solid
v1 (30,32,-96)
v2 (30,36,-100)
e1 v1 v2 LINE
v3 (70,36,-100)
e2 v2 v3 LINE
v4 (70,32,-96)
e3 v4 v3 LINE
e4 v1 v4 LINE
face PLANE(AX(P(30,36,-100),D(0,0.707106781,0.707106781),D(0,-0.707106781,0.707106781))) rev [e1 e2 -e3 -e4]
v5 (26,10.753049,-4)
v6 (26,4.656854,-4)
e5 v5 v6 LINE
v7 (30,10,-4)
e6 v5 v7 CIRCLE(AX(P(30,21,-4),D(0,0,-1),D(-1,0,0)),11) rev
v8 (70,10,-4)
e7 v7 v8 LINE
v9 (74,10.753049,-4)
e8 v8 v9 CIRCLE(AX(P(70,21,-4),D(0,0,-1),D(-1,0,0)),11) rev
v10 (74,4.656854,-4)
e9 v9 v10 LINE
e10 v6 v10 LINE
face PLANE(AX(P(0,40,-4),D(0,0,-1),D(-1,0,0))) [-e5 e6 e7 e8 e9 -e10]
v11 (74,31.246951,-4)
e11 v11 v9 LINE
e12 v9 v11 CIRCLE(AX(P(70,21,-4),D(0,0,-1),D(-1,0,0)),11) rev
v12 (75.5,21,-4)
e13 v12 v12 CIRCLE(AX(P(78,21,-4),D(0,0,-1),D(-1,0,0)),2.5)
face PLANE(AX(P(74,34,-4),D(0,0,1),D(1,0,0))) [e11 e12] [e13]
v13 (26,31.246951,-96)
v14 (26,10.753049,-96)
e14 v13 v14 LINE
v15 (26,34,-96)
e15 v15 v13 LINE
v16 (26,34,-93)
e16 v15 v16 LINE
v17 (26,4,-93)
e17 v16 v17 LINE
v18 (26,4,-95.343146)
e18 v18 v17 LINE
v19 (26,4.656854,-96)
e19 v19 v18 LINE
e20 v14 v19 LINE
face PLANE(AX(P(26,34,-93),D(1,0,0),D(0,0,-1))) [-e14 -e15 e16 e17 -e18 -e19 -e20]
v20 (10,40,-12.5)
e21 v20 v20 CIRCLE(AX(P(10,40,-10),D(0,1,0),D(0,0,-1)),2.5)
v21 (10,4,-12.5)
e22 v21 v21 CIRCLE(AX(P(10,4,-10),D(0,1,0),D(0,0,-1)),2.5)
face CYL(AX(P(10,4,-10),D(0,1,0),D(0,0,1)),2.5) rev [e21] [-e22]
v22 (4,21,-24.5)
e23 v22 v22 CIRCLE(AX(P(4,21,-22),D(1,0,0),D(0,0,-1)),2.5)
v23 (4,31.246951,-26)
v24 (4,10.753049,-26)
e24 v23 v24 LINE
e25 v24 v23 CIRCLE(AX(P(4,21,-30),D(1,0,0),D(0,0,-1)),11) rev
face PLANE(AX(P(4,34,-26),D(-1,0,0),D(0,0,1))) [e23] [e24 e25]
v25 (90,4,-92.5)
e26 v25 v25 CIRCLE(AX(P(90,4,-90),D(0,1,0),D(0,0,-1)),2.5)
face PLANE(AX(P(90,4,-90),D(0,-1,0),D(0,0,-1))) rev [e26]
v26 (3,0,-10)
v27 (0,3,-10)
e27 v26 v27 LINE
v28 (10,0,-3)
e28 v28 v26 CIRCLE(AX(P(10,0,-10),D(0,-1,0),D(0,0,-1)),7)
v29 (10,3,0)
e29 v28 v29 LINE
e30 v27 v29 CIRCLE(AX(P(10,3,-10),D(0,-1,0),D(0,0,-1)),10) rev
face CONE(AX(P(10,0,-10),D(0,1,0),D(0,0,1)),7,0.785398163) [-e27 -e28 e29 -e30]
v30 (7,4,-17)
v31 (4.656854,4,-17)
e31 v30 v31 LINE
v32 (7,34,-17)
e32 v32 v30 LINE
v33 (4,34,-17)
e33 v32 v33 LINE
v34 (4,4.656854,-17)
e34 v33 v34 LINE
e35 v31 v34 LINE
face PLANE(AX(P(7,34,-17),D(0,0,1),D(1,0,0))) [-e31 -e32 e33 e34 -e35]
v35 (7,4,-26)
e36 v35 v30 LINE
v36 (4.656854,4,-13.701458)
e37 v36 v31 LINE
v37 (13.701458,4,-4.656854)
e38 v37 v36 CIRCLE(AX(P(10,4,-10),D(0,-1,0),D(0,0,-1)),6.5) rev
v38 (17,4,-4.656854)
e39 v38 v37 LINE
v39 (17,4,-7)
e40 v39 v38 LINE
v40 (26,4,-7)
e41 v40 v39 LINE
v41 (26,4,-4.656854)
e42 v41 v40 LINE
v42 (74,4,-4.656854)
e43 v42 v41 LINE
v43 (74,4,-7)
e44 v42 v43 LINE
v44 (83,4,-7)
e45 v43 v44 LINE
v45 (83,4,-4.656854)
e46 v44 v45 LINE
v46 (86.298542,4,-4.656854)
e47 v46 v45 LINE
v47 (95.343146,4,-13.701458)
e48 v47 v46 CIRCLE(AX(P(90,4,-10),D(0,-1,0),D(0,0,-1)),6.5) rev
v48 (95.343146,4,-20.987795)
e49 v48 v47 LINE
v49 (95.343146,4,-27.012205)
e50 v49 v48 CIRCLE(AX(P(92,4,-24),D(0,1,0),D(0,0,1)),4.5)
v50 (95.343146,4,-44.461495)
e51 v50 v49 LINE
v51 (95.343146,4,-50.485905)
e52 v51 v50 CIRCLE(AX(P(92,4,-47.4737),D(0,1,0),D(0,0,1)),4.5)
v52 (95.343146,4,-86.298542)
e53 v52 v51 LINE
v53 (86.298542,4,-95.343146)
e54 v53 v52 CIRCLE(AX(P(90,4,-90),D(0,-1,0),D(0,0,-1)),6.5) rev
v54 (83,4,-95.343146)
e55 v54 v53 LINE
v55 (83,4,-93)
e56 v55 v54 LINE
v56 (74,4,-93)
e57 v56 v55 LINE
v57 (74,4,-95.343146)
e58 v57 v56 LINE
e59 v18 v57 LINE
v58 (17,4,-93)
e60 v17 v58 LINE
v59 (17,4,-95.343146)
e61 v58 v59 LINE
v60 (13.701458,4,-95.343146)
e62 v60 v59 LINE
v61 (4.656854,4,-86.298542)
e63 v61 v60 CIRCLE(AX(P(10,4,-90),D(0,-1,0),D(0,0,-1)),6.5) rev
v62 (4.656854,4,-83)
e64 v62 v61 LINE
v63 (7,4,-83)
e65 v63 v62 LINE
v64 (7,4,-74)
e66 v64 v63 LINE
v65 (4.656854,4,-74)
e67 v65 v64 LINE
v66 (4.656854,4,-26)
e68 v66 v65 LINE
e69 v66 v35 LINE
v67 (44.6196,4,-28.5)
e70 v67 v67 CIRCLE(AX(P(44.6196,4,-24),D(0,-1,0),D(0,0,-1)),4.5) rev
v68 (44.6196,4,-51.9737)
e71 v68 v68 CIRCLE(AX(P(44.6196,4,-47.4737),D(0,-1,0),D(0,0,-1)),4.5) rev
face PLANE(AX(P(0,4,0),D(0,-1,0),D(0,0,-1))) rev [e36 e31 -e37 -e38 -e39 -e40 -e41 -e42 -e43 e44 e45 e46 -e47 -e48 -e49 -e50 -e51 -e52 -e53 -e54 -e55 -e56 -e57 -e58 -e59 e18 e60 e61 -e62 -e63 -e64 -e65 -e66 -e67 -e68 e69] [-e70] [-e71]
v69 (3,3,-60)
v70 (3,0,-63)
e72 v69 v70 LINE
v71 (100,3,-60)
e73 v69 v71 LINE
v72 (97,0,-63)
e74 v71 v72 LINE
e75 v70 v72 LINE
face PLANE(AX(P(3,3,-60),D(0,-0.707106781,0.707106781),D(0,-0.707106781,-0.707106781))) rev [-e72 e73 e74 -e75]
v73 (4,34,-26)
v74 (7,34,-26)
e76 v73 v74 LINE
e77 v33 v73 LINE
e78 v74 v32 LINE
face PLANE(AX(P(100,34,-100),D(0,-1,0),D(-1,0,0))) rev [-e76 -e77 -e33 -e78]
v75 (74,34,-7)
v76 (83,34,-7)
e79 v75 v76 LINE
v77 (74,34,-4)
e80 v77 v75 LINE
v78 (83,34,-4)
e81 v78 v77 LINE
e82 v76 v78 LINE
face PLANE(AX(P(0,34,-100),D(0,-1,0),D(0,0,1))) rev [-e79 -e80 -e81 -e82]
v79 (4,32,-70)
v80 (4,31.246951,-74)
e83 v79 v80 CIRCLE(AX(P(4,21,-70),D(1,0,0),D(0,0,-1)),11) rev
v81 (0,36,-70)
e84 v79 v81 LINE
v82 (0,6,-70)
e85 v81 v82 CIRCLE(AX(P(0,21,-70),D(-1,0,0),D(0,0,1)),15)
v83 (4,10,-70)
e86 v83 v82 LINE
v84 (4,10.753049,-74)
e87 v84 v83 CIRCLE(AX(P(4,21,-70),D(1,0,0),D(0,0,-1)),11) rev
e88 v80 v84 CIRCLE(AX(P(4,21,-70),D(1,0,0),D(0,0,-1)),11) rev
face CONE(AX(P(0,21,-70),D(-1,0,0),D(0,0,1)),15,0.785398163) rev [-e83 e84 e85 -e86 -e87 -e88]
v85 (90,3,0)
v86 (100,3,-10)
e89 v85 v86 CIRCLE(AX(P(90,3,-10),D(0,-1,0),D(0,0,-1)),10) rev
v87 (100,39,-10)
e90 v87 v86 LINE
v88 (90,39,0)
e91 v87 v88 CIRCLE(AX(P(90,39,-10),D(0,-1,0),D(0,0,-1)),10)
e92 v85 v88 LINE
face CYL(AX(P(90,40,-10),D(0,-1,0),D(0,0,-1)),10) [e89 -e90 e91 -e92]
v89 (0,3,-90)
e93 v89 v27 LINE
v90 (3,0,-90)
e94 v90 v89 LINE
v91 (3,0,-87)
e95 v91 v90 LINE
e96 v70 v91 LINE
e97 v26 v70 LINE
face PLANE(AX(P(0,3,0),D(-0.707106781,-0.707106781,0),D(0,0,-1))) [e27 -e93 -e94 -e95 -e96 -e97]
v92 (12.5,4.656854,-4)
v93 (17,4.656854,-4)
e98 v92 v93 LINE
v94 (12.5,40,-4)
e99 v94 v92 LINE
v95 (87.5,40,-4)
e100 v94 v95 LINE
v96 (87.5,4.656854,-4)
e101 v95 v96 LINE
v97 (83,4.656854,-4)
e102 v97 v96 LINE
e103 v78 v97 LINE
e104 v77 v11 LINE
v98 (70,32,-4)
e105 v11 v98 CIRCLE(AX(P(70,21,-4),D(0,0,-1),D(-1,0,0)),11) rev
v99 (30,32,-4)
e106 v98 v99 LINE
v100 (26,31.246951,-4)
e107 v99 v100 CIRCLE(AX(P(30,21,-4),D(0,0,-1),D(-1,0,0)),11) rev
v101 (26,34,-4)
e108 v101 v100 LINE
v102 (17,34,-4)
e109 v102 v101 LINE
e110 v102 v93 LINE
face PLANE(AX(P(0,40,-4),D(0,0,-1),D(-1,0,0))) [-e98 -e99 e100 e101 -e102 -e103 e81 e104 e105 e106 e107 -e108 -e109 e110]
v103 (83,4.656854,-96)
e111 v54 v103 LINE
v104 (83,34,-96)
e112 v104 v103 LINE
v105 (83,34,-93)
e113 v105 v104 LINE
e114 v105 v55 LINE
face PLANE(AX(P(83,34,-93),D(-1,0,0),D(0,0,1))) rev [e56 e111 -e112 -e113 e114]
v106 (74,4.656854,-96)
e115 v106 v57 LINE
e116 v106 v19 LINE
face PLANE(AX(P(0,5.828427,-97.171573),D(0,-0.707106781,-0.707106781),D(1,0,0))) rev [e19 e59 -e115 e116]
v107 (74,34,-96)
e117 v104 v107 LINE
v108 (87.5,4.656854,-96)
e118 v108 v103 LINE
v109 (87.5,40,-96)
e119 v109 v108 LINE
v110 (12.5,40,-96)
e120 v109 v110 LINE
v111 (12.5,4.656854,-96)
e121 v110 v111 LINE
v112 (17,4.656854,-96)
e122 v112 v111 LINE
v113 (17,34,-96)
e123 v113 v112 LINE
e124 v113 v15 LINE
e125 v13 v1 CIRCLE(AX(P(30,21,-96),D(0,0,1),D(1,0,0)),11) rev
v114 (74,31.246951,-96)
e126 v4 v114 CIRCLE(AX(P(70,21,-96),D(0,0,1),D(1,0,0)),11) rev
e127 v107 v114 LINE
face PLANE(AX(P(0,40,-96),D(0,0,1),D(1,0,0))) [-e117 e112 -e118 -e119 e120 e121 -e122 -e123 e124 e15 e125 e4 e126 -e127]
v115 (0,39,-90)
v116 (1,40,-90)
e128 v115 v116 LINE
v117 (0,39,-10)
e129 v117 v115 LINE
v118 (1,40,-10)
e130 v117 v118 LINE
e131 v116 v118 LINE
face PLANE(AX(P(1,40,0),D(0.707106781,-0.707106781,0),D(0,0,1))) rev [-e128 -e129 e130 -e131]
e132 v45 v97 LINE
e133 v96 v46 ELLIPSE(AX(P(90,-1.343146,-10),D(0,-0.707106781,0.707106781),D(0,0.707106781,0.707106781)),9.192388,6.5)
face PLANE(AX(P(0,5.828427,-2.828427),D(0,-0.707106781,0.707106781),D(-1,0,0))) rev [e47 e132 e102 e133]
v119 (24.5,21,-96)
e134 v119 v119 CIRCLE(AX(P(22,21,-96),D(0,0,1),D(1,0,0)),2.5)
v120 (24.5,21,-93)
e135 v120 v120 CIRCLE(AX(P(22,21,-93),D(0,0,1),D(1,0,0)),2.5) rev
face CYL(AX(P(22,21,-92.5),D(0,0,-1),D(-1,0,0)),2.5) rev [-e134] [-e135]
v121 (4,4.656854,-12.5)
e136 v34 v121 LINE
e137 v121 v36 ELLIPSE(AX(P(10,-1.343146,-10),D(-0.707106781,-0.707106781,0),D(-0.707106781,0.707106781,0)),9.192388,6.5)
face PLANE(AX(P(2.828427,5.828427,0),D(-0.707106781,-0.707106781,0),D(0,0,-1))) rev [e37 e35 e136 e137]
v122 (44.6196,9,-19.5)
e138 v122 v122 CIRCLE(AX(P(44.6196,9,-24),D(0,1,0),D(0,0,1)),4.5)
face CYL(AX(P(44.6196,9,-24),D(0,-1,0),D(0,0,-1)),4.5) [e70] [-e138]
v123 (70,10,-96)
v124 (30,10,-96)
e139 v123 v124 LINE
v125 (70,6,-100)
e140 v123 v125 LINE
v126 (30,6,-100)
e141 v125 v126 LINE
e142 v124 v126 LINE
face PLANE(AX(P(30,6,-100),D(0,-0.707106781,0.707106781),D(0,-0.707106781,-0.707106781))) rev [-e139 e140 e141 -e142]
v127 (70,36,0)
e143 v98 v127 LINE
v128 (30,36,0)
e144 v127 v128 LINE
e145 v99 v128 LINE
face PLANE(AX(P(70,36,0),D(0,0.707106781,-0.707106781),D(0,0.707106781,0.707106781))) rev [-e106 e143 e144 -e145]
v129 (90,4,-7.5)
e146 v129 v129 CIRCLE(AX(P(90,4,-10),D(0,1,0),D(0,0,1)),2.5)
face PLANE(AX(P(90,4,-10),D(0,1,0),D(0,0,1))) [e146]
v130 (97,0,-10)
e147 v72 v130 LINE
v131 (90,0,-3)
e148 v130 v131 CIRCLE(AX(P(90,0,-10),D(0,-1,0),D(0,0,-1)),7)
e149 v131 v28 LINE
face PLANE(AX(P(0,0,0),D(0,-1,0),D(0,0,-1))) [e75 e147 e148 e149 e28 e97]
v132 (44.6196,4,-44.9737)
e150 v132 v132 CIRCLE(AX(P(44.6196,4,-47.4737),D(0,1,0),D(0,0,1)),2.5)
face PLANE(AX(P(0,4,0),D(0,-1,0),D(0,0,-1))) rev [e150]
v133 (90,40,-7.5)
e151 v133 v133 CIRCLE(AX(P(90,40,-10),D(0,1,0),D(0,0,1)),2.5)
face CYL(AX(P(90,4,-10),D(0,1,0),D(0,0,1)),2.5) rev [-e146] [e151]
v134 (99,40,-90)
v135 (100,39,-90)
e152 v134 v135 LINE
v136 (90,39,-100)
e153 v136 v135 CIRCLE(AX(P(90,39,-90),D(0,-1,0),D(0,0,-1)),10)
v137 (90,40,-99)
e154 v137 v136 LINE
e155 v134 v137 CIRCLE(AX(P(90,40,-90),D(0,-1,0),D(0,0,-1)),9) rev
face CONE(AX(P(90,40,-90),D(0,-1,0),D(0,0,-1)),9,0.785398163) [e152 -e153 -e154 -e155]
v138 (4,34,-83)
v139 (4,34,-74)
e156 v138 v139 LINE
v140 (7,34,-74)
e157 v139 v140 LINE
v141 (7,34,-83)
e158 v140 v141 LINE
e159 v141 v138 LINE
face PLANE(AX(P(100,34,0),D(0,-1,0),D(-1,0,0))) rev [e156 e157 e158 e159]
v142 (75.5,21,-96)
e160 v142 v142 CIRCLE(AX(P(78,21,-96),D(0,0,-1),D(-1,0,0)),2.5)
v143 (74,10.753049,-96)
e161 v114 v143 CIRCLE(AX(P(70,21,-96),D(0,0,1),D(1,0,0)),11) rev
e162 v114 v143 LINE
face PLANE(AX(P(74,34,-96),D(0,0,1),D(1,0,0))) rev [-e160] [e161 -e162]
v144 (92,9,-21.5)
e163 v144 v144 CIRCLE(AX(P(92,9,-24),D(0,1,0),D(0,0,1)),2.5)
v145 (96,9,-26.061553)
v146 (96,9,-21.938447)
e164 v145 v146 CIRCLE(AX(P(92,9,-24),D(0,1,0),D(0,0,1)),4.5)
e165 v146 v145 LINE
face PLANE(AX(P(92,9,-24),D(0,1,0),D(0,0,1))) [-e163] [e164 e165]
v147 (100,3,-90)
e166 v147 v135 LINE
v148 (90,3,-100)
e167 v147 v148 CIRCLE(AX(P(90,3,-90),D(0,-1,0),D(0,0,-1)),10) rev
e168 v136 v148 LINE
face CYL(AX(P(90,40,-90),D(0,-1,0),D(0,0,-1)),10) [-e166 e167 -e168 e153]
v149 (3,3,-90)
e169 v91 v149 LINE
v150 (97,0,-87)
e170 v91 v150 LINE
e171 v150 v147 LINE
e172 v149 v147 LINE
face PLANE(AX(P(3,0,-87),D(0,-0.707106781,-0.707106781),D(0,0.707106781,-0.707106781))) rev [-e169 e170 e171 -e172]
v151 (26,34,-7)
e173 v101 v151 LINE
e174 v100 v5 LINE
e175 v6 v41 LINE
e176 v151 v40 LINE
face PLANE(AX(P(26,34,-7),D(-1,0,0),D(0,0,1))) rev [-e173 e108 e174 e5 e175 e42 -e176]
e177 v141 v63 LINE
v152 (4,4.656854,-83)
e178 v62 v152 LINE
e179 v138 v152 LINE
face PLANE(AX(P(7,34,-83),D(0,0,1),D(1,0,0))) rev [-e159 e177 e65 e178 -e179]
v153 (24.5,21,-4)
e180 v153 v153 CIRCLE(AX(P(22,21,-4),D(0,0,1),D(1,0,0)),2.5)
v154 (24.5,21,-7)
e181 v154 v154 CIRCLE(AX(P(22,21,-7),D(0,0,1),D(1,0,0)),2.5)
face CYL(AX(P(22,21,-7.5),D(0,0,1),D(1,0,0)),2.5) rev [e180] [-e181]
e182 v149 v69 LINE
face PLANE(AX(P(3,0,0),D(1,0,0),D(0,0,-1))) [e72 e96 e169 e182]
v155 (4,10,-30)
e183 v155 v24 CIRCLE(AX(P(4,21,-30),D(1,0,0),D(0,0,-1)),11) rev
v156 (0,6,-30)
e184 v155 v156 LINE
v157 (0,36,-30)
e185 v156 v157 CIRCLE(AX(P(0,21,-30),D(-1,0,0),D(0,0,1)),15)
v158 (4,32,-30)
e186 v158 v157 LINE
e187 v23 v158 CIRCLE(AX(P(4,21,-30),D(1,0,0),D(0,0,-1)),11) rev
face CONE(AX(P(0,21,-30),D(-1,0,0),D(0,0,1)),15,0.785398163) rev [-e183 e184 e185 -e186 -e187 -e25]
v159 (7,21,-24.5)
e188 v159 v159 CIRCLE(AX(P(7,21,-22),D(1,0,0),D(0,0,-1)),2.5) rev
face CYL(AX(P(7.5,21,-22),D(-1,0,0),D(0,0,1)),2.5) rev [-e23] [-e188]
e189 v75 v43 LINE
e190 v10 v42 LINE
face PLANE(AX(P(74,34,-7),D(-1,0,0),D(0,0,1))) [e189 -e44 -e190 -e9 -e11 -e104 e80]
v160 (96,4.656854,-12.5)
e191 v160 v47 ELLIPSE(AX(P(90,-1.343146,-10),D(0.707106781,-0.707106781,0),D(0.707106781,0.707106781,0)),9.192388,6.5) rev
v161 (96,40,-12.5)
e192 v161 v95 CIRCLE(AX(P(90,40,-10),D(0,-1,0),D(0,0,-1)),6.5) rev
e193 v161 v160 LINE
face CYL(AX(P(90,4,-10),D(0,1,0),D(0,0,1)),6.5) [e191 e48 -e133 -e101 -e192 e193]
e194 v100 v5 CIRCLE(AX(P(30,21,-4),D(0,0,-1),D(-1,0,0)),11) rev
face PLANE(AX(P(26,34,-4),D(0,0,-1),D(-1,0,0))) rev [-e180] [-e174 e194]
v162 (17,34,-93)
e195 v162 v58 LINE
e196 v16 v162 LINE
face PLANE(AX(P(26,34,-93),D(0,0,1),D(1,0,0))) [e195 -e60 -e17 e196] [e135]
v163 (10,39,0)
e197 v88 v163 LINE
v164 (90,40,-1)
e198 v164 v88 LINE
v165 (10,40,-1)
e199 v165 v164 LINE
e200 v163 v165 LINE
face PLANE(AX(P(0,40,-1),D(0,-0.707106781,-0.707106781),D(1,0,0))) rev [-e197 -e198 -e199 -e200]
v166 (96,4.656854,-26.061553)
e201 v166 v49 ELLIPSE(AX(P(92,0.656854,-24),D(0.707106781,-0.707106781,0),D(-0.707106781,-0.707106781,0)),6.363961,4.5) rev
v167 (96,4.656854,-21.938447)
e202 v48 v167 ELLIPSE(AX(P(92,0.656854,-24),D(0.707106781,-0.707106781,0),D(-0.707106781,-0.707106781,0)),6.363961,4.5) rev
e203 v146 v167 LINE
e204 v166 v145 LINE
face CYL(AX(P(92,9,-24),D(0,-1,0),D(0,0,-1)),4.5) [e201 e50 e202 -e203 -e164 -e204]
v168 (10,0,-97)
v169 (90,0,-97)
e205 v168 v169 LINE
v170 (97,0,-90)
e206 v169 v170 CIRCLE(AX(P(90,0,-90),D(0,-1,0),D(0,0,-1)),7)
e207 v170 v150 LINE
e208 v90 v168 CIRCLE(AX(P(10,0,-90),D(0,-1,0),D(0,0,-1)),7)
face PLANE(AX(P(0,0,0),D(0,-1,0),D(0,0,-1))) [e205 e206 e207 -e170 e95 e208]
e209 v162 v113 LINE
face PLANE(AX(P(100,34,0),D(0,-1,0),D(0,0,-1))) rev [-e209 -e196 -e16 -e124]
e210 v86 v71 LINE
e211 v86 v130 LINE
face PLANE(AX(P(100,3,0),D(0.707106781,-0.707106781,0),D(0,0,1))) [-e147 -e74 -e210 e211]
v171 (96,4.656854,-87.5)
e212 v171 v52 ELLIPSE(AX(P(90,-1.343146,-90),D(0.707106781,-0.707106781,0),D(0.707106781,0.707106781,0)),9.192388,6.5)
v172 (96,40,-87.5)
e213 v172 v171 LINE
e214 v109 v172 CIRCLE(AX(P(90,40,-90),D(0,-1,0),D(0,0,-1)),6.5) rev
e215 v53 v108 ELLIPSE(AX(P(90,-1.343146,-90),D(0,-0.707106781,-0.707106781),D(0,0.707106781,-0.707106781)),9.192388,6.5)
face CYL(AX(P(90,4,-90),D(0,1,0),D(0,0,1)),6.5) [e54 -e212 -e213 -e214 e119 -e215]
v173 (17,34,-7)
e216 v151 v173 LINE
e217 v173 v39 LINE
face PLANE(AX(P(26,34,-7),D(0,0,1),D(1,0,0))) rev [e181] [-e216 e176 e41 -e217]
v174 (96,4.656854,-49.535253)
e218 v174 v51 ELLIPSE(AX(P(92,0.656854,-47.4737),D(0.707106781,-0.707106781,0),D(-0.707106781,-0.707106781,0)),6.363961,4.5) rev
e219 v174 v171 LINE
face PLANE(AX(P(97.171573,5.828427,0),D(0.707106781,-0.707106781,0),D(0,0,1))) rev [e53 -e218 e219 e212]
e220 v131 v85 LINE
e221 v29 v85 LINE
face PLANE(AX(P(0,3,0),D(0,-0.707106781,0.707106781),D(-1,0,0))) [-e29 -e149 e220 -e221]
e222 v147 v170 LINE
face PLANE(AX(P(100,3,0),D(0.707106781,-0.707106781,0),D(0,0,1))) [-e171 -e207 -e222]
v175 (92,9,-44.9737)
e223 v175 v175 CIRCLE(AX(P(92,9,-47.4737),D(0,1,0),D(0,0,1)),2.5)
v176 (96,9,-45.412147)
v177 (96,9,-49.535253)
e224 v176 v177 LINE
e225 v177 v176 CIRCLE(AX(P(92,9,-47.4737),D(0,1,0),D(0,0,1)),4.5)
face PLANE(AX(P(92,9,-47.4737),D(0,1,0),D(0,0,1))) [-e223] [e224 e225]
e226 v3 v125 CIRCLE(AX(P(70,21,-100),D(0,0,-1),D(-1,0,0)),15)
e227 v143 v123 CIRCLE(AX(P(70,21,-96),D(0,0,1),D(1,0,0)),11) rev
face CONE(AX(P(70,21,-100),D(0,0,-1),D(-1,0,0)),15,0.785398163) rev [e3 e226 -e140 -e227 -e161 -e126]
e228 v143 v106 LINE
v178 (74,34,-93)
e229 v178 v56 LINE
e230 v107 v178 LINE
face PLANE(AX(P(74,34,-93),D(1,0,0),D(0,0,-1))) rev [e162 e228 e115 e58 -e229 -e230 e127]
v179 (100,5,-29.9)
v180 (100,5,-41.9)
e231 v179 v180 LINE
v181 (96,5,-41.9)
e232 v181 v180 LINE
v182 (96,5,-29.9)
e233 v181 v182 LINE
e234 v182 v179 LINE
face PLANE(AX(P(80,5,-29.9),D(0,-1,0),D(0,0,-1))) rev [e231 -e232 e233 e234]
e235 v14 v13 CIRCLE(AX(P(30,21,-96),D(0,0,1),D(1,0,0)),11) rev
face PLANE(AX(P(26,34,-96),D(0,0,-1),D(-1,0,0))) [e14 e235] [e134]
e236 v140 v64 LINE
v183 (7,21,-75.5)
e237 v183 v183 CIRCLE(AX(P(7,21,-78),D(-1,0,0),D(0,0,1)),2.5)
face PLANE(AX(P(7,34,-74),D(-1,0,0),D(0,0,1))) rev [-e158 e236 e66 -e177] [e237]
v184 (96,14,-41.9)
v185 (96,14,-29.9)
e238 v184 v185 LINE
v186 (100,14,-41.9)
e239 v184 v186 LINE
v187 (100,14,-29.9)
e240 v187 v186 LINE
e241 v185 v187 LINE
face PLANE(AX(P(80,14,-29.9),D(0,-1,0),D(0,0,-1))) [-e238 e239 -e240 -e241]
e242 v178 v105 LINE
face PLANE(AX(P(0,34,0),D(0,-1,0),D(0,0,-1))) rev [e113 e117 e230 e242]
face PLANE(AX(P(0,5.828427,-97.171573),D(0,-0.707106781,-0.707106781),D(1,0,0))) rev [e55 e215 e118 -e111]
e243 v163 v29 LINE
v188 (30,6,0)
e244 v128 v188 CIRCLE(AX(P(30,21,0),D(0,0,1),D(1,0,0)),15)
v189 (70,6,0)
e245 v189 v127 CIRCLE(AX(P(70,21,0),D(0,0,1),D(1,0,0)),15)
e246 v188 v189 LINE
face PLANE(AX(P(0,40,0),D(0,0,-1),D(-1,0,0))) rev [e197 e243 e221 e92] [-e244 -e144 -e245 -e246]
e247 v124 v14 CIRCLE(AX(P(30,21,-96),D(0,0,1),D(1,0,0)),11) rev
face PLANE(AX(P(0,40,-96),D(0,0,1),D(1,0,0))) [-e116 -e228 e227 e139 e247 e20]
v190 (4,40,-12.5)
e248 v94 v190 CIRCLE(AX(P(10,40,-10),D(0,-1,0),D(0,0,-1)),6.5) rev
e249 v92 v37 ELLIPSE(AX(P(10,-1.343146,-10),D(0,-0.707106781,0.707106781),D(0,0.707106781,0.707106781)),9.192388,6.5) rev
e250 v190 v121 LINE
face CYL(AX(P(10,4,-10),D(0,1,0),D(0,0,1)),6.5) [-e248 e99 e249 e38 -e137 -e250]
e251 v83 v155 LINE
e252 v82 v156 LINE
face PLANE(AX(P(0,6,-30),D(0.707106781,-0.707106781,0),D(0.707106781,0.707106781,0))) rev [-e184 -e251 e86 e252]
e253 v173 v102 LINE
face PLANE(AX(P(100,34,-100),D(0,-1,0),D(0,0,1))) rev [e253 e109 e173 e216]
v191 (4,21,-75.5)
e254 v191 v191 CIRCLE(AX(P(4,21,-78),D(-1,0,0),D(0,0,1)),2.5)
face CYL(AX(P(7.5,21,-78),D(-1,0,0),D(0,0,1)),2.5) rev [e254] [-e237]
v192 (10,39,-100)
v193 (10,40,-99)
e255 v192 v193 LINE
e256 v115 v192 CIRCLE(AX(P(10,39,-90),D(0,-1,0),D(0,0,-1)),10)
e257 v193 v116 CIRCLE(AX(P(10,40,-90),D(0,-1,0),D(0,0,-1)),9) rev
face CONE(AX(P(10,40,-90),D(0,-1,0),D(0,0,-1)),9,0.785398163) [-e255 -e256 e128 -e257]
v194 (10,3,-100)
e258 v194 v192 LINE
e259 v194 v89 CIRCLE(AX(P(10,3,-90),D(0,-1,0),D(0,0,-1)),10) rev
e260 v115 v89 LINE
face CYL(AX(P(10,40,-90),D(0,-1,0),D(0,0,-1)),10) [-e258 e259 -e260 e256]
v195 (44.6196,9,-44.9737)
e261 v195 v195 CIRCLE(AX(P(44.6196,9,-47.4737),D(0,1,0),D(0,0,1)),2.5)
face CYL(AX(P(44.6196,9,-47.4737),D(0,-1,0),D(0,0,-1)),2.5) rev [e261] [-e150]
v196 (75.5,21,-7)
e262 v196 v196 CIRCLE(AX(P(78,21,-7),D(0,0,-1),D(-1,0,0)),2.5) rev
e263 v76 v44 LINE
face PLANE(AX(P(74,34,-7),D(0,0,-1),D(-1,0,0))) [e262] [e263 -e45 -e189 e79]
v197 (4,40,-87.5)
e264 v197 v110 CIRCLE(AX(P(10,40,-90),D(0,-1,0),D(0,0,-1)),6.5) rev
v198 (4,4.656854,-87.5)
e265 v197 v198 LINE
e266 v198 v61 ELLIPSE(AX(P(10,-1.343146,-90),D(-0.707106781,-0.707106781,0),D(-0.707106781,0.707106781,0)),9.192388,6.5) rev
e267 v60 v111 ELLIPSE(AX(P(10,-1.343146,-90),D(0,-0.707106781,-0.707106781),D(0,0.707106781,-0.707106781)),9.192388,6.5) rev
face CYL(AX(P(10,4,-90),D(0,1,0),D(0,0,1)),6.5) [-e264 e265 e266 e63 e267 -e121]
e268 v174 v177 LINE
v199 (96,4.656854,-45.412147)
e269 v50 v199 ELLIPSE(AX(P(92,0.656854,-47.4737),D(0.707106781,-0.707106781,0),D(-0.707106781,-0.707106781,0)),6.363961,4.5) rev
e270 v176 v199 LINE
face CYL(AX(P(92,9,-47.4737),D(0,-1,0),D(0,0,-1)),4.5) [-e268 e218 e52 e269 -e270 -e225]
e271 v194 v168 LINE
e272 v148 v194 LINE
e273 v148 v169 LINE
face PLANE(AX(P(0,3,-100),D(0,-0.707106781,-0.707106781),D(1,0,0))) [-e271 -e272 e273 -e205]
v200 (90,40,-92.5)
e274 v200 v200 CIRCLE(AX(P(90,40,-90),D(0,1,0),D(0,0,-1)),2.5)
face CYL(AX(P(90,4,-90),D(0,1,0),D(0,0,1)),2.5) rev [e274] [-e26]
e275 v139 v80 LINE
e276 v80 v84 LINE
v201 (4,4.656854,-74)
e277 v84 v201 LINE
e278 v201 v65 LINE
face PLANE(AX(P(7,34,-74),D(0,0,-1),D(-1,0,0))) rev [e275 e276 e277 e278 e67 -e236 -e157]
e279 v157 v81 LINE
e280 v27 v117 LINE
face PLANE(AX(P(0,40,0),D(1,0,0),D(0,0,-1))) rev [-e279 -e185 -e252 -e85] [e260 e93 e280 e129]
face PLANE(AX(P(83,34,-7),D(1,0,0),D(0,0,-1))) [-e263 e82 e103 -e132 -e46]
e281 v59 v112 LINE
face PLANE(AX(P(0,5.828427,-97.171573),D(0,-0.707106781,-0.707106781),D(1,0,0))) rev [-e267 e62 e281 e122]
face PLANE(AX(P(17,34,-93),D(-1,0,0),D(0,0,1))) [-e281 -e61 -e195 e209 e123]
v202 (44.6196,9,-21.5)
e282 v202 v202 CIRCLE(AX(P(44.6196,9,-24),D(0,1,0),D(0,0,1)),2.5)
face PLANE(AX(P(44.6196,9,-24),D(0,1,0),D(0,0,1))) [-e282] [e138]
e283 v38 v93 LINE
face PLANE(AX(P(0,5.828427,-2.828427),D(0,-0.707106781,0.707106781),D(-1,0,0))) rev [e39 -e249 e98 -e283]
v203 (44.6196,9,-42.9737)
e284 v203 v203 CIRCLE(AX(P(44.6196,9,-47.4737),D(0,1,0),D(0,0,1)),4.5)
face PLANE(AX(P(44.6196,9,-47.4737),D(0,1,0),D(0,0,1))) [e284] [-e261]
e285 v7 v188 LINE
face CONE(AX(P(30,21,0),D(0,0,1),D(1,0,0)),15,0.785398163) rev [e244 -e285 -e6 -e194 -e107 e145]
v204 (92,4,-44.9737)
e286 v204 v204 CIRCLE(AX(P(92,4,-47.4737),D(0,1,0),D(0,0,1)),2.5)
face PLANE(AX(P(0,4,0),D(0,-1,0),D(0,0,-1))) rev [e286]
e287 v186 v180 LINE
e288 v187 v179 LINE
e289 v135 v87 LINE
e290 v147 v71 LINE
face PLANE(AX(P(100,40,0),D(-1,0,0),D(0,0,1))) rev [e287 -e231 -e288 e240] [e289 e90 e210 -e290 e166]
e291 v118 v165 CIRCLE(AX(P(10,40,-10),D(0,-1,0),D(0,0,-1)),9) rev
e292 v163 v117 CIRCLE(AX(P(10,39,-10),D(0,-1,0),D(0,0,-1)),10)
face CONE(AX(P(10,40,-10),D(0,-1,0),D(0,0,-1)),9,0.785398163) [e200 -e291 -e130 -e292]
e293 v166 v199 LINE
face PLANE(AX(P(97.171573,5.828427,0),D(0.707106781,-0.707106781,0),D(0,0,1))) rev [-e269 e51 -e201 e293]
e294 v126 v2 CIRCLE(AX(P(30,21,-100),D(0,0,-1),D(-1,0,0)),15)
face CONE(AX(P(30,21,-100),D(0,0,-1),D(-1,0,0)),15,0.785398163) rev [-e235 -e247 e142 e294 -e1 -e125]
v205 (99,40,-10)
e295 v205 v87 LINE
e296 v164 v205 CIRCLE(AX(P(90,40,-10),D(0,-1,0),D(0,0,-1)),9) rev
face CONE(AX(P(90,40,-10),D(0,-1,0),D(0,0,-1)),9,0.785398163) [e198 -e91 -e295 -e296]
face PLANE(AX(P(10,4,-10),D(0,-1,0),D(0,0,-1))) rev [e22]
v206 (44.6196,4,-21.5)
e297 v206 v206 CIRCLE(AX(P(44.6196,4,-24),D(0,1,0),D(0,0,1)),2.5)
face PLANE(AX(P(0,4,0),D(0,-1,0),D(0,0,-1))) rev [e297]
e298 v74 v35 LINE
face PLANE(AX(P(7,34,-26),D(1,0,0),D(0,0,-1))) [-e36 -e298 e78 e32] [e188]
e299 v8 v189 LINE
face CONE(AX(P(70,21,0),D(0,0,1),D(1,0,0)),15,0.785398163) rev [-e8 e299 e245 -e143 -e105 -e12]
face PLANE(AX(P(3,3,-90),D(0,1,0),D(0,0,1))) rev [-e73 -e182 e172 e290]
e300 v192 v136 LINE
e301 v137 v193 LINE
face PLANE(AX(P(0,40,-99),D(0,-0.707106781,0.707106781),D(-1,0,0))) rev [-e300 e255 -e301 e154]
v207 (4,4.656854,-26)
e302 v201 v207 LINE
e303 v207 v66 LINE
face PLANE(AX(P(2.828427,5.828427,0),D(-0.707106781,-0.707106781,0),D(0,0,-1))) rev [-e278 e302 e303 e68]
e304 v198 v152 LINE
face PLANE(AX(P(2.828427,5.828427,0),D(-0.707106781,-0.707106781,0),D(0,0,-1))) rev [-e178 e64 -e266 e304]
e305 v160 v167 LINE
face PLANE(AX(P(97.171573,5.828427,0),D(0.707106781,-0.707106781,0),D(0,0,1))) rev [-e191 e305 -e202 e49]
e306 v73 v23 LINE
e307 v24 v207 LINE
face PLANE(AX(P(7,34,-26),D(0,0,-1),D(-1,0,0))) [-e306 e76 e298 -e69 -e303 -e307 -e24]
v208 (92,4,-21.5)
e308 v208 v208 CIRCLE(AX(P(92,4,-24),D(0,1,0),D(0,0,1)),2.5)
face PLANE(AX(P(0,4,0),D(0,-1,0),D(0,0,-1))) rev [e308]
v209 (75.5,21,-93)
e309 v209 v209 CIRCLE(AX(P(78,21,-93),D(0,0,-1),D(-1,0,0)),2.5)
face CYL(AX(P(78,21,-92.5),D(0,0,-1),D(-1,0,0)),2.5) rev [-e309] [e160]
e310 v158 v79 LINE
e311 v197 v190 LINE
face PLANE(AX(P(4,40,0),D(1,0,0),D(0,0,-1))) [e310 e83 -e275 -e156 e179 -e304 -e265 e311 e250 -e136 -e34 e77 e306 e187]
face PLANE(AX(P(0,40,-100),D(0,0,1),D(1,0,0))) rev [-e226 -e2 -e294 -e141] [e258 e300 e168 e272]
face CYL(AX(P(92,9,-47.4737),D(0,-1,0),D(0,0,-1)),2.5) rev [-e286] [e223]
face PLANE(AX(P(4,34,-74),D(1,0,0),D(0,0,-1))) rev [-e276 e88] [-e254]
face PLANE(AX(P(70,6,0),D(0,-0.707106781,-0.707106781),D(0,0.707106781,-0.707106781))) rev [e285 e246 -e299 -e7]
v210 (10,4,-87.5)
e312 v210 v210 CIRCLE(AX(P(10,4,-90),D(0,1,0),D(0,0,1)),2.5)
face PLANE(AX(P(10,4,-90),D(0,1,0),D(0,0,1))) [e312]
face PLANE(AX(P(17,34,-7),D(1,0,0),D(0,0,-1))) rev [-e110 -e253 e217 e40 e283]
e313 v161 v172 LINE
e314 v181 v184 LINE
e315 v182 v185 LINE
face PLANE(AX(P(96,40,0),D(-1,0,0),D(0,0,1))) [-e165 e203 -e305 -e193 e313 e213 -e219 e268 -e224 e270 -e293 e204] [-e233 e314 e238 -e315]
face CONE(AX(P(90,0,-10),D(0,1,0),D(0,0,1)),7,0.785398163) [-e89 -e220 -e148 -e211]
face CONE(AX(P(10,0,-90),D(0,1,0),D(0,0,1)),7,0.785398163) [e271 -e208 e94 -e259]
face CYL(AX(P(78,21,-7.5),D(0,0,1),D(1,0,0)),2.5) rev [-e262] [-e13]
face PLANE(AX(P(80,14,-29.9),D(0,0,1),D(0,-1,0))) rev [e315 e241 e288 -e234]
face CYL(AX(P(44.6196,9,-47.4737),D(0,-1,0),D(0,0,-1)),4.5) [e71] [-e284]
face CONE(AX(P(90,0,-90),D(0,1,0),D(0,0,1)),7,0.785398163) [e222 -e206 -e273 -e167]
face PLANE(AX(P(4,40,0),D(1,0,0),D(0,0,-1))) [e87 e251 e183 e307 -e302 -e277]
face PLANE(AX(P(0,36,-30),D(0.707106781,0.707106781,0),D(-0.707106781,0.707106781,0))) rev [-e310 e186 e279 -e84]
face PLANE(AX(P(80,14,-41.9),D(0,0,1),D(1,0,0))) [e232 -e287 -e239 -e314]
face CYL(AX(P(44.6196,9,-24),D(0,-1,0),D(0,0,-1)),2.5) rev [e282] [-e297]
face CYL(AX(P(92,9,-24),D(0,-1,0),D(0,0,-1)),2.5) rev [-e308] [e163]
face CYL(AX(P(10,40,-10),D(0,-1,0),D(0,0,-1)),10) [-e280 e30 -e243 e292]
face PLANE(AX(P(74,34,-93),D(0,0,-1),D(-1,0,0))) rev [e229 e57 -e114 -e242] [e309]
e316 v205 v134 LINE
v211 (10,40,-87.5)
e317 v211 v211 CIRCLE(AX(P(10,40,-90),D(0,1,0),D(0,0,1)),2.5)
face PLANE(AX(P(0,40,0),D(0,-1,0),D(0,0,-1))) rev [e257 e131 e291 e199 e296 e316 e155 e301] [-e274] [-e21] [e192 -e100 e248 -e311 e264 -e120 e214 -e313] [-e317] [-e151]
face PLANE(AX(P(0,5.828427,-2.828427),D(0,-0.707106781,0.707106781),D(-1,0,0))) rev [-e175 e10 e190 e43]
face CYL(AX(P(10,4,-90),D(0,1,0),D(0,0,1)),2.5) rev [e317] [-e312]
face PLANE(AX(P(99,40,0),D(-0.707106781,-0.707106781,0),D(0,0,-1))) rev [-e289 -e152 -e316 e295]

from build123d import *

# Parameters (mm, degrees)
ESQUISSE1_W                            = 100
ESQUISSE1_H                            = 100
BOSS_EXTRU_1_DEPTH                     = 40
CONG_1_R                               = 10
CHANFREIN1_SIZE                        = 3
ESQUISSE4_R                            = 2.5
ENL_V_MAT_EXTRU_1_DEPTH                = 36
COQUE2_START                           = 4
COQUE2_DEPTH                           = 92
COQUE2_2_OUTLINE_R                     = 2.5
COQUE2_2_DEPTH                         = 36
COQUE2_START_2                         = -88
COQUE2_3_DEPTH                         = 76
ESQUISSE5_R                            = 4.5
ESQUISSE5_R_2                          = 2.5
BOSS_EXTRU_2_DEPTH                     = 5
ESQUISSE6_W                            = 12
ESQUISSE6_H                            = 9
ENL_V_MAT_EXTRU_2_DEPTH                = 20
ENL_V_MAT_EXTRU_3_DEPTH                = 4
ENL_V_MAT_EXTRU_3_DRAFT                = -45
ESQUISSE8_W                            = 9
ESQUISSE8_H                            = 3
BOSS_EXTRU_6_DEPTH                     = 30
ESQUISSE9_R                            = 2.5
ENL_V_MAT_EXTRU_4_DEPTH                = 3.5
R_P_TITION_CIRCULAIRE1_COUNT           = 3
R_P_TITION_CIRCULAIRE1_ANGLE           = 180
R_P_TITION_CIRCULAIRE1_COPY_1_DEPTH    = 4
R_P_TITION_CIRCULAIRE1_COPY_1_DRAFT    = -45
R_P_TITION_CIRCULAIRE1_COPY_2_DEPTH    = 4
R_P_TITION_CIRCULAIRE1_COPY_2_DRAFT    = -45
R_P_TITION_CIRCULAIRE1_COPY_3_SKETCH_W = 9
R_P_TITION_CIRCULAIRE1_COPY_3_SKETCH_H = 3
R_P_TITION_CIRCULAIRE1_COPY_3_DEPTH    = 30
R_P_TITION_CIRCULAIRE1_COPY_4_SKETCH_W = 9
R_P_TITION_CIRCULAIRE1_COPY_4_SKETCH_H = 3
R_P_TITION_CIRCULAIRE1_COPY_4_DEPTH    = 30
R_P_TITION_CIRCULAIRE1_COPY_5_SKETCH_R = 2.5
R_P_TITION_CIRCULAIRE1_COPY_5_DEPTH    = 3.5
R_P_TITION_CIRCULAIRE1_COPY_6_SKETCH_R = 2.5
R_P_TITION_CIRCULAIRE1_COPY_6_DEPTH    = 3.5
ENL_V_MAT_EXTRU_5_DEPTH                = 97
CHANFREIN2_SIZE                        = 1


with BuildPart() as part:
    # Esquisse1 → Boss.-Extru.1 (new body)
    with BuildSketch(Plane(origin=(0, 0, 0), x_dir=(1, 0, 0), z_dir=(0, 1, 0))):
        with Locations((50, 50)):
            Rectangle(ESQUISSE1_W, ESQUISSE1_H)
    extrude(amount=BOSS_EXTRU_1_DEPTH)

    # Congé1
    cong_1_edges = [part.edges().sort_by_distance(p)[0] for p in [
        (0, 20, -100),
        (100, 20, -100),
        (100, 20, 0),
        (0, 20, 0),
    ]]
    fillet(cong_1_edges, radius=CONG_1_R)

    # Chanfrein1
    chanfrein1_edges = [part.edges().sort_by_distance(p)[0] for p in [
        (50, 0, -100),
        (0, 0, -50),
        (100, 0, -50),
        (50, 0, 0),
        (97.071067812, 0, -2.928932188),
        (2.928932188, 0, -2.928932188),
        (2.928932188, 0, -97.071067812),
        (97.071067812, 0, -97.071067812),
    ]]
    chamfer(chanfrein1_edges, length=CHANFREIN1_SIZE)

    # Esquisse4 → Enlèv. mat.-Extru.1 (cut)
    with BuildSketch(Plane(origin=(0, 40, 0), x_dir=(1, 0, 0), z_dir=(0, 1, 0))):
        with Locations(Location((10, 90, 0), (0, 0, 270))):
            Circle(ESQUISSE4_R)
        with Locations(Location((10, 10, 0), (0, 0, 90))):
            Circle(ESQUISSE4_R)
        with Locations(Location((90, 10, 0), (0, 0, 270))):
            Circle(ESQUISSE4_R)
        with Locations(Location((90, 90, 0), (0, 0, 90))):
            Circle(ESQUISSE4_R)
    extrude(amount=-ENL_V_MAT_EXTRU_1_DEPTH, mode=Mode.SUBTRACT)

    # Coque2: read off the stored shape, not the designer's step
    # Coque2 outline → Coque2 (cut)
    with BuildSketch(Plane.YZ.offset(COQUE2_START)):
        Polygon((4.656854249, -4), (4, -4.656854249), (4, -95.343145751), (4.656854249, -96), (40, -96), (40, -4), align=None)
    extrude(amount=COQUE2_DEPTH, mode=Mode.SUBTRACT)

    # Coque2 2 outline → Coque2 2 (add)
    # profile 1 of 4: a face of its own
    with BuildSketch(Plane(origin=(0, 0, 0), x_dir=(1, 0, 0), z_dir=(0, 1, 0)).offset(COQUE2_START)):
        with BuildLine():
            Line((96, 96), (87.5, 96))
            ThreePointArc((87.5, 96), (85.403805922, 85.403805922), (96, 87.5))
            Line((96, 87.5), (96, 96))
        make_face()
        with Locations((90, 90)):
            Circle(COQUE2_2_OUTLINE_R, mode=Mode.SUBTRACT)
    # profile 2 of 4: a face of its own
    with BuildSketch(Plane(origin=(0, 0, 0), x_dir=(1, 0, 0), z_dir=(0, 1, 0)).offset(COQUE2_START)):
        with BuildLine():
            ThreePointArc((4, 87.5), (14.596194078, 85.403805922), (12.5, 96))
            Line((12.5, 96), (4, 96))
            Line((4, 96), (4, 87.5))
        make_face()
        with Locations((10, 90)):
            Circle(COQUE2_2_OUTLINE_R, mode=Mode.SUBTRACT)
    # profile 3 of 4: a face of its own
    with BuildSketch(Plane(origin=(0, 0, 0), x_dir=(1, 0, 0), z_dir=(0, 1, 0)).offset(COQUE2_START)):
        with BuildLine():
            Line((96, 4), (96, 12.5))
            ThreePointArc((96, 12.5), (85.403805922, 14.596194078), (87.5, 4))
            Line((87.5, 4), (96, 4))
        make_face()
        with Locations((90, 10)):
            Circle(COQUE2_2_OUTLINE_R, mode=Mode.SUBTRACT)
    # profile 4 of 4: a face of its own
    with BuildSketch(Plane(origin=(0, 0, 0), x_dir=(1, 0, 0), z_dir=(0, 1, 0)).offset(COQUE2_START)):
        with BuildLine():
            ThreePointArc((12.5, 4), (14.596194078, 14.596194078), (4, 12.5))
            Line((4, 12.5), (4, 4))
            Line((4, 4), (12.5, 4))
        make_face()
        with Locations((10, 10)):
            Circle(COQUE2_2_OUTLINE_R, mode=Mode.SUBTRACT)
    extrude(amount=COQUE2_2_DEPTH)

    # Coque2 3 outline → Coque2 3 (add)
    with BuildSketch(Plane.XY.offset(COQUE2_START_2)):
        Polygon((4, 4), (4.656854249, 4), (4, 4.656854249), align=None)
        Polygon((96, 4.656854249), (95.343145751, 4), (96, 4), align=None)
    extrude(amount=COQUE2_3_DEPTH)

    # Esquisse5 → Boss.-Extru.2 (add)
    # profile 1 of 4: a face of its own
    with BuildSketch(Plane(origin=(0, 4, 0), x_dir=(1, 0, 0), z_dir=(0, 1, 0))):
        with Locations(Location((44.6195999, 47.4737, 0), (0, 0, 90))):
            Circle(ESQUISSE5_R)
        with Locations(Location((44.6195999, 47.4737, 0), (0, 0, 270))):
            Circle(ESQUISSE5_R_2, mode=Mode.SUBTRACT)
    # profile 2 of 4: a face of its own
    with BuildSketch(Plane(origin=(0, 4, 0), x_dir=(1, 0, 0), z_dir=(0, 1, 0))):
        with Locations(Location((44.6195999, 24, 0), (0, 0, 90))):
            Circle(ESQUISSE5_R)
        with Locations(Location((44.6195999, 24, 0), (0, 0, 270))):
            Circle(ESQUISSE5_R_2, mode=Mode.SUBTRACT)
    # profile 3 of 4: a face of its own
    with BuildSketch(Plane(origin=(0, 4, 0), x_dir=(1, 0, 0), z_dir=(0, 1, 0))):
        with Locations((92, 24)):
            Circle(ESQUISSE5_R)
        with Locations(Location((92, 24, 0), (0, 0, 270))):
            Circle(ESQUISSE5_R_2, mode=Mode.SUBTRACT)
    # profile 4 of 4: a face of its own
    with BuildSketch(Plane(origin=(0, 4, 0), x_dir=(1, 0, 0), z_dir=(0, 1, 0))):
        with Locations((92, 47.4737)):
            Circle(ESQUISSE5_R)
        with Locations(Location((92, 47.4737, 0), (0, 0, 270))):
            Circle(ESQUISSE5_R_2, mode=Mode.SUBTRACT)
    extrude(amount=BOSS_EXTRU_2_DEPTH)

    # Esquisse6 → Enlèv. mat.-Extru.2 (cut)
    with BuildSketch(Plane(origin=(100, 0, 0), x_dir=(0, 0, -1), z_dir=(1, 0, 0))):
        with Locations((35.9, 9.5)):
            Rectangle(ESQUISSE6_W, ESQUISSE6_H)
    extrude(amount=-ENL_V_MAT_EXTRU_2_DEPTH, mode=Mode.SUBTRACT)


with BuildPart() as enl_v_mat_extru_3_tool:
    # Esquisse7 → Enlèv. mat.-Extru.3 (with draft: the straight prism first)
    with BuildSketch(Plane(origin=(0, 0, -100), x_dir=(-1, 0, 0), z_dir=(0, 0, -1))):
        with BuildLine():
            ThreePointArc((-30, 6), (-15, 21), (-30, 36))
            Line((-30, 36), (-70, 36))
            ThreePointArc((-70, 36), (-85, 21), (-70, 6))
            Line((-70, 6), (-30, 6))
        make_face()
    extrude(amount=-ENL_V_MAT_EXTRU_3_DEPTH)
    # Enlèv. mat.-Extru.3: the draft: its side faces are tilted about the plane it starts from
    enl_v_mat_extru_3_sides = [enl_v_mat_extru_3_tool.faces().sort_by_distance(p)[0] for p in [
        (15, 21, -98),
        (50, 36, -98),
        (85, 21, -98),
        (50, 6, -98),
    ]]
    draft(enl_v_mat_extru_3_sides, Plane(origin=(0, 0, -100), x_dir=(-1, 0, 0), z_dir=(0, 0, -1)), ENL_V_MAT_EXTRU_3_DRAFT)


with BuildPart() as part_1:
    add(part.part)

    # Enlèv. mat.-Extru.3: cut by enl_v_mat_extru_3_tool
    add(enl_v_mat_extru_3_tool.part, mode=Mode.SUBTRACT)

    # Esquisse8 → Boss.-Extru.6 (add)
    with BuildSketch(Plane(origin=(0, 4, 0), x_dir=(1, 0, 0), z_dir=(0, 1, 0))):
        with Locations((78.5, 94.5)):
            Rectangle(ESQUISSE8_W, ESQUISSE8_H)
    boss_extru_6 = extrude(amount=BOSS_EXTRU_6_DEPTH)

    # Esquisse9 → Enlèv. mat.-Extru.4 (cut)
    with BuildSketch(Plane(origin=(0, 0, -96), x_dir=(-1, 0, 0), z_dir=(0, 0, -1))):
        with Locations((-78, 21)):
            Circle(ESQUISSE9_R)
    enl_v_mat_extru_4 = extrude(amount=-ENL_V_MAT_EXTRU_4_DEPTH, mode=Mode.SUBTRACT)

    # Symétrie1: Boss.-Extru.6, Enlèv. mat.-Extru.4 across plane
    add(boss_extru_6.mirror(Plane(origin=(50, 0, 0), x_dir=(0, 0, 1), z_dir=(1, 0, 0))))
    add(enl_v_mat_extru_4.mirror(Plane(origin=(50, 0, 0), x_dir=(0, 0, 1), z_dir=(1, 0, 0))), mode=Mode.SUBTRACT)

    # Répétition circulaire1: Boss.-Extru.6, Enlèv. mat.-Extru.4 ×3 about axis
    r_p_tition_circulaire1_axis = Axis((50, 0, -50), (0, 1, 0))
    add([boss_extru_6.rotate(r_p_tition_circulaire1_axis, i * R_P_TITION_CIRCULAIRE1_ANGLE / (R_P_TITION_CIRCULAIRE1_COUNT - 1)) for i in range(1, R_P_TITION_CIRCULAIRE1_COUNT)])
    add([enl_v_mat_extru_4.rotate(r_p_tition_circulaire1_axis, i * R_P_TITION_CIRCULAIRE1_ANGLE / (R_P_TITION_CIRCULAIRE1_COUNT - 1)) for i in range(1, R_P_TITION_CIRCULAIRE1_COUNT)], mode=Mode.SUBTRACT)


with BuildPart() as r_p_tition_circulaire1_copy_1_tool:
    # Répétition circulaire1 copy 1 sketch → Répétition circulaire1 copy 1 (with draft: the straight prism first)
    with BuildSketch(Plane.ZY):
        with BuildLine():
            ThreePointArc((-30, 6), (-15, 21), (-30, 36))
            Line((-30, 36), (-70, 36))
            ThreePointArc((-70, 36), (-85, 21), (-70, 6))
            Line((-70, 6), (-30, 6))
        make_face()
    extrude(amount=-R_P_TITION_CIRCULAIRE1_COPY_1_DEPTH)
    # Répétition circulaire1 copy 1: the draft: its side faces are tilted about the plane it starts from
    r_p_tition_circulaire1_copy_1_sides = [r_p_tition_circulaire1_copy_1_tool.faces().sort_by_distance(p)[0] for p in [
        (2, 21, -15),
        (2, 36, -50),
        (2, 21, -85),
        (2, 6, -50),
    ]]
    draft(r_p_tition_circulaire1_copy_1_sides, Plane.ZY, R_P_TITION_CIRCULAIRE1_COPY_1_DRAFT)


with BuildPart() as part_2:
    add(part_1.part)

    # Répétition circulaire1 copy 1: cut by r_p_tition_circulaire1_copy_1_tool
    add(r_p_tition_circulaire1_copy_1_tool.part, mode=Mode.SUBTRACT)


with BuildPart() as r_p_tition_circulaire1_copy_2_tool:
    # Répétition circulaire1 copy 2 sketch → Répétition circulaire1 copy 2 (with draft: the straight prism first)
    with BuildSketch(Plane(origin=(100, 0, 0), x_dir=(1, 0, 0), z_dir=(0, 0, 1))):
        with BuildLine():
            ThreePointArc((-30, 6), (-15, 21), (-30, 36))
            Line((-30, 36), (-70, 36))
            ThreePointArc((-70, 36), (-85, 21), (-70, 6))
            Line((-70, 6), (-30, 6))
        make_face()
    extrude(amount=-R_P_TITION_CIRCULAIRE1_COPY_2_DEPTH)
    # Répétition circulaire1 copy 2: the draft: its side faces are tilted about the plane it starts from
    r_p_tition_circulaire1_copy_2_sides = [r_p_tition_circulaire1_copy_2_tool.faces().sort_by_distance(p)[0] for p in [
        (85, 21, -2),
        (50, 36, -2),
        (15, 21, -2),
        (50, 6, -2),
    ]]
    draft(r_p_tition_circulaire1_copy_2_sides, Plane(origin=(100, 0, 0), x_dir=(1, 0, 0), z_dir=(0, 0, 1)), R_P_TITION_CIRCULAIRE1_COPY_2_DRAFT)


with BuildPart() as part_3:
    add(part_2.part)

    # Répétition circulaire1 copy 2: cut by r_p_tition_circulaire1_copy_2_tool
    add(r_p_tition_circulaire1_copy_2_tool.part, mode=Mode.SUBTRACT)

    # Répétition circulaire1 copy 3 sketch → Répétition circulaire1 copy 3 (add)
    with BuildSketch(Plane(origin=(100, 4, -100), x_dir=(0, 0, 1), z_dir=(0, 1, 0))):
        with Locations((78.5, -94.5)):
            Rectangle(R_P_TITION_CIRCULAIRE1_COPY_3_SKETCH_W, R_P_TITION_CIRCULAIRE1_COPY_3_SKETCH_H)
    extrude(amount=R_P_TITION_CIRCULAIRE1_COPY_3_DEPTH)

    # Répétition circulaire1 copy 4 sketch → Répétition circulaire1 copy 4 (add)
    with BuildSketch(Plane(origin=(0, 4, -100), x_dir=(1, 0, 0), z_dir=(0, 1, 0))):
        with Locations((78.5, -94.5)):
            Rectangle(R_P_TITION_CIRCULAIRE1_COPY_4_SKETCH_W, R_P_TITION_CIRCULAIRE1_COPY_4_SKETCH_H)
    extrude(amount=R_P_TITION_CIRCULAIRE1_COPY_4_DEPTH)

    # Répétition circulaire1 copy 5 sketch → Répétition circulaire1 copy 5 (cut)
    with BuildSketch(Plane(origin=(4, 0, -100), x_dir=(0, 0, -1), z_dir=(-1, 0, 0))):
        with Locations((-78, -21)):
            Circle(R_P_TITION_CIRCULAIRE1_COPY_5_SKETCH_R)
    extrude(amount=-R_P_TITION_CIRCULAIRE1_COPY_5_DEPTH, mode=Mode.SUBTRACT)

    # Répétition circulaire1 copy 6 sketch → Répétition circulaire1 copy 6 (cut)
    with BuildSketch(Plane(origin=(0, 0, -4), x_dir=(-1, 0, 0), z_dir=(0, 0, 1))):
        with Locations((-78, -21)):
            Circle(R_P_TITION_CIRCULAIRE1_COPY_6_SKETCH_R)
    extrude(amount=-R_P_TITION_CIRCULAIRE1_COPY_6_DEPTH, mode=Mode.SUBTRACT)

    # Esquisse11 → Enlèv. mat.-Extru.5 (cut)
    with BuildSketch(Plane(origin=(100, 0, 0), x_dir=(0, 0, -1), z_dir=(1, 0, 0))):
        Polygon((60, 3), (63, 0), (87, 0), (90, 3), align=None)
    extrude(amount=-ENL_V_MAT_EXTRU_5_DEPTH, mode=Mode.SUBTRACT)

    # Chanfrein2
    chanfrein2_edges = [part_3.edges().sort_by_distance(p)[0] for p in [
        (50, 40, -100),
        (100, 40, -50),
        (0, 40, -50),
        (50, 40, 0),
        (97.071067812, 40, -2.928932188),
        (2.928932188, 40, -2.928932188),
        (2.928932188, 40, -97.071067812),
        (97.071067812, 40, -97.071067812),
    ]]
    chamfer(chanfrein2_edges, length=CHANFREIN2_SIZE)


solid = part_3.part
